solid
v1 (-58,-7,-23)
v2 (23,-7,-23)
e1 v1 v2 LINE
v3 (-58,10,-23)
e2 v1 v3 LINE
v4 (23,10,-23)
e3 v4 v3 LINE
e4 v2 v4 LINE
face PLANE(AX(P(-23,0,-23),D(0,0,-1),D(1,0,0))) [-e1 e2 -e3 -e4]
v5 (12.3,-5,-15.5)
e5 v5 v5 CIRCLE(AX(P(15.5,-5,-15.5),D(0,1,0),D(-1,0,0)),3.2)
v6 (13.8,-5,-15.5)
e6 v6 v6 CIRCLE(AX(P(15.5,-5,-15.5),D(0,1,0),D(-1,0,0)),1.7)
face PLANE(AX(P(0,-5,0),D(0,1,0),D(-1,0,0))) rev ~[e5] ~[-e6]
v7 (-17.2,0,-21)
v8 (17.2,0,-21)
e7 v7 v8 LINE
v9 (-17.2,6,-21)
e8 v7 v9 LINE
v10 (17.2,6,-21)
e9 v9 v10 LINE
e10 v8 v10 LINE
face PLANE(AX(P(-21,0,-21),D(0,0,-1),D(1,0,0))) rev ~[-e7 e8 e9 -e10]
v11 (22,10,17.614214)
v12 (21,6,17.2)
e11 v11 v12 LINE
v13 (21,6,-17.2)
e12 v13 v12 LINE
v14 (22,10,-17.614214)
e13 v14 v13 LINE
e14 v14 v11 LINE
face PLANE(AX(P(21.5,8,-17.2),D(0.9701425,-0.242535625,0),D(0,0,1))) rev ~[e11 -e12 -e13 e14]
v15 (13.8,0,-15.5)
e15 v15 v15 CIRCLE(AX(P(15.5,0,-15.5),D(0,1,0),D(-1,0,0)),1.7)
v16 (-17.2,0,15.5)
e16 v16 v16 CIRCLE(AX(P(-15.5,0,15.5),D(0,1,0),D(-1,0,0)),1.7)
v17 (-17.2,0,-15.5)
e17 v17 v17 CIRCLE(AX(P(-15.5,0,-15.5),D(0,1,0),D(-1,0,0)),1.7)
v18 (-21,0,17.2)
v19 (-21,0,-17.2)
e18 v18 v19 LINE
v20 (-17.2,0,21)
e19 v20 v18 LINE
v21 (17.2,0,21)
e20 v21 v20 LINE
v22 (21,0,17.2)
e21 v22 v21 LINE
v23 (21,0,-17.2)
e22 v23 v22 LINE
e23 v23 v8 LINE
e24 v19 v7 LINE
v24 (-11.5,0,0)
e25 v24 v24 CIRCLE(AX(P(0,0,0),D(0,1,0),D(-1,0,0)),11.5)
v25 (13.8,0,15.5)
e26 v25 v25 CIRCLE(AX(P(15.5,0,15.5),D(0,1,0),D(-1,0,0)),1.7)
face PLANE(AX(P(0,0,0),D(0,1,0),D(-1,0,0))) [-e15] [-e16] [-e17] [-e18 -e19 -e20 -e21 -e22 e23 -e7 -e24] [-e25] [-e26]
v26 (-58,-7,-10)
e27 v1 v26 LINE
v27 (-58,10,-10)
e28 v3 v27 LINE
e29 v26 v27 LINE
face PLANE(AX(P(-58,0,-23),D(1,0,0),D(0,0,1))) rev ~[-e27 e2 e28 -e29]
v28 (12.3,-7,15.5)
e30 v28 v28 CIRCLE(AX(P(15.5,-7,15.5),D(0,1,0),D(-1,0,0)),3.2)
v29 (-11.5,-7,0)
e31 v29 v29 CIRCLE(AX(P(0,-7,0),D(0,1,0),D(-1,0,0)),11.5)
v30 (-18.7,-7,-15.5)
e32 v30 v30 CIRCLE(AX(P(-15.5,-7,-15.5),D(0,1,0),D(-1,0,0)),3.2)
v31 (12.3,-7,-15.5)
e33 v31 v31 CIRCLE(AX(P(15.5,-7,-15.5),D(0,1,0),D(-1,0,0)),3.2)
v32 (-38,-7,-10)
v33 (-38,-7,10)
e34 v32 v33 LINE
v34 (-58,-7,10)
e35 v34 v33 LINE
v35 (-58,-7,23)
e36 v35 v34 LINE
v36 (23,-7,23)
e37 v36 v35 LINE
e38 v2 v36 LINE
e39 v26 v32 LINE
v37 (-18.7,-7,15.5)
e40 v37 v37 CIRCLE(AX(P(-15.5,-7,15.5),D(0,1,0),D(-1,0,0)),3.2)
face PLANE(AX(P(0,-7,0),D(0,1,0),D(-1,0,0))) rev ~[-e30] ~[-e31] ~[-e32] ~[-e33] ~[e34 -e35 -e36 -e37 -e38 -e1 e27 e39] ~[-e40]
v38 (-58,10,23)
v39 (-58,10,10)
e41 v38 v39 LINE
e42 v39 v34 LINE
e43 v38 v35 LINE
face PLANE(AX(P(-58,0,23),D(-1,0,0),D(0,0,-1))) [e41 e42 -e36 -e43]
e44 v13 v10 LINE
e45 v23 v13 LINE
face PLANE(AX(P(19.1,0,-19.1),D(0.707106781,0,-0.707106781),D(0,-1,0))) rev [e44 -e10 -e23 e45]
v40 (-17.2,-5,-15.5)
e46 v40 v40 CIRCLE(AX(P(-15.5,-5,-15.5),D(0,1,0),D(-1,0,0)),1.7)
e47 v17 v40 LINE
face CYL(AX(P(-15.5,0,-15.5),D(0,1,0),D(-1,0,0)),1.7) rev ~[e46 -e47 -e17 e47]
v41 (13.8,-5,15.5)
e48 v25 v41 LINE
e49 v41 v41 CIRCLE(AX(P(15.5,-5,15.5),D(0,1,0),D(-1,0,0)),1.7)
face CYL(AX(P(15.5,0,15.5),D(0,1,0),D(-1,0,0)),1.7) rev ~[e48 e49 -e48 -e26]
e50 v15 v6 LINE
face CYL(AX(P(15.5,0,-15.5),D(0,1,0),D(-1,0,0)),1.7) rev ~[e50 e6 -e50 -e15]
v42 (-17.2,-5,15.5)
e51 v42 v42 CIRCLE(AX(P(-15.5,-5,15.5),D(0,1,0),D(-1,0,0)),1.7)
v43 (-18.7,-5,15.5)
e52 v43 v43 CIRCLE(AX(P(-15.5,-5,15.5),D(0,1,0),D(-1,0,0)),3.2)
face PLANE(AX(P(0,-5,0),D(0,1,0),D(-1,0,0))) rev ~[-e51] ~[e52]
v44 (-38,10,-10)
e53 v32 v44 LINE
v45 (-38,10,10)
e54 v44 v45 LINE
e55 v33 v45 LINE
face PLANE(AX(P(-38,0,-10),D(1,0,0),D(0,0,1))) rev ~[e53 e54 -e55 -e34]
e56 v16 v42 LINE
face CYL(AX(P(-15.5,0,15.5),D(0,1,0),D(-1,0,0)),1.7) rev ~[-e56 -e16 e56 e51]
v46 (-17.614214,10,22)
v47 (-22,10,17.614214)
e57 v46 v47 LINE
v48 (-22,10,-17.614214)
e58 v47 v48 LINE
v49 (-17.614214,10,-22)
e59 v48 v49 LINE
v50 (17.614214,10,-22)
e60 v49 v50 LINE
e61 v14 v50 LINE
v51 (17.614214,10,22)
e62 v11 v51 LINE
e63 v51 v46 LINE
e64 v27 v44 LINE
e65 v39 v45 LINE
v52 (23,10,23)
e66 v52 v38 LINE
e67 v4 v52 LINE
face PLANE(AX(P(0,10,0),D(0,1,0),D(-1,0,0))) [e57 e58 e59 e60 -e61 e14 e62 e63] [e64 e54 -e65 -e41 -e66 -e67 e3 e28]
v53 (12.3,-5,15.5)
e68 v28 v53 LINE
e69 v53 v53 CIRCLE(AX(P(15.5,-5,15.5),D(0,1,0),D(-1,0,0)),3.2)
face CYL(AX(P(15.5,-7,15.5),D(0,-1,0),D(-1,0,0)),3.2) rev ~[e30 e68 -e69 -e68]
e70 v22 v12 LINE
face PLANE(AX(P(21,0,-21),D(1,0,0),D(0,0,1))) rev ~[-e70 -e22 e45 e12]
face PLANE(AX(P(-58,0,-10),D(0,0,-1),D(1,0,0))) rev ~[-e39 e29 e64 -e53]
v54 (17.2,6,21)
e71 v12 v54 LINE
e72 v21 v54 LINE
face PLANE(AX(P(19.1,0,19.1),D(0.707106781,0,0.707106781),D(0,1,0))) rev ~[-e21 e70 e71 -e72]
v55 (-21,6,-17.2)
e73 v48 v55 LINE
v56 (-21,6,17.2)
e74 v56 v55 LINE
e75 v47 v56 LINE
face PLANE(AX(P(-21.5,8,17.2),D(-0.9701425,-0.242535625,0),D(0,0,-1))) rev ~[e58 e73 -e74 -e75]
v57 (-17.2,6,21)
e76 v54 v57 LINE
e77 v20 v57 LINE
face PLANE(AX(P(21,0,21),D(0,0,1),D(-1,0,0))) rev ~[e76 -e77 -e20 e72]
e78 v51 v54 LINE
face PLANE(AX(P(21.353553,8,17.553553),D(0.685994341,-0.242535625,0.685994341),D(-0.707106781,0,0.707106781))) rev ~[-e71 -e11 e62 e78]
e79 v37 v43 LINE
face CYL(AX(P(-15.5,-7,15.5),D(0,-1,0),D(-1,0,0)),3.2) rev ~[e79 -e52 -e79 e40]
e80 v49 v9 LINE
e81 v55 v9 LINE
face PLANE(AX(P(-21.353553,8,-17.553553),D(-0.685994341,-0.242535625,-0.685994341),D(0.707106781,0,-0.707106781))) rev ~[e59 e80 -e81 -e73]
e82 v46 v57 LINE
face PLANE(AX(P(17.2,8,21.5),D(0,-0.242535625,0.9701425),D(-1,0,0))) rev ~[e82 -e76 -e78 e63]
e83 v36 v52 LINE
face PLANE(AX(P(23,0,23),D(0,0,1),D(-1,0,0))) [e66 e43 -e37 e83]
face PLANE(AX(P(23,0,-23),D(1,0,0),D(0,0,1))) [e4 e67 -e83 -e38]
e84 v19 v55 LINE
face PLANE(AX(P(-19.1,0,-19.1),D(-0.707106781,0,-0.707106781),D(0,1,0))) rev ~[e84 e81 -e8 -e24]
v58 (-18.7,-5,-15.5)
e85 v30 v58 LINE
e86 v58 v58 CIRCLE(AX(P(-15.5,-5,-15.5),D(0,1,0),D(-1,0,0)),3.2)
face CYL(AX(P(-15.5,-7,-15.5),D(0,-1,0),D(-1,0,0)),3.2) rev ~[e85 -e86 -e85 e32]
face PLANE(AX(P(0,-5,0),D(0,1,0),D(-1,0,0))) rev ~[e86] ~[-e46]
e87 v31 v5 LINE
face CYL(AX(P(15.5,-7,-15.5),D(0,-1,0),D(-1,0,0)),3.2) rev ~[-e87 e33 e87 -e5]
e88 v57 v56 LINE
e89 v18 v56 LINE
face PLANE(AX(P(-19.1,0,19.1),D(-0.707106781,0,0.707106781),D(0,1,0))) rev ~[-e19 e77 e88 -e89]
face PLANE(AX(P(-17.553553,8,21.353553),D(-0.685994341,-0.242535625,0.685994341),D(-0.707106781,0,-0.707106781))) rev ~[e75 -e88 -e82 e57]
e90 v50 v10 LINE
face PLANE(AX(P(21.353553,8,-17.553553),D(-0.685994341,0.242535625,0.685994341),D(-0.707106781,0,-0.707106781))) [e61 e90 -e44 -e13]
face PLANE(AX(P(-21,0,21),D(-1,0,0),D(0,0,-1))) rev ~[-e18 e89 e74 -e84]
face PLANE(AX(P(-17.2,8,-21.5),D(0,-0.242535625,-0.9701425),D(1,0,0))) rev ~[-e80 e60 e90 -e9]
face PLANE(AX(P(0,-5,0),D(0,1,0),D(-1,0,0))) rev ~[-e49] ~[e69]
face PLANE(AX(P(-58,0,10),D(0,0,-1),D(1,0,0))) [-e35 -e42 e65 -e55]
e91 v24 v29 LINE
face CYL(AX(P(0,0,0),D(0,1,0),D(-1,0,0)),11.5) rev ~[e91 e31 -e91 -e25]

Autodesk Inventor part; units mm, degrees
ref_plane "YZ Plane" through (0, 0, 0) normal (1, 0, 0) x (0, 1, 0)
ref_plane "XZ Plane" through (0, 0, 0) normal (0, 1, 0) x (-1, 0, 0)
ref_plane "XY Plane" through (0, 0, 0) normal (0, 0, 1) x (1, 0, 0)
sketch "Sketch1" plane through (0, 0, 0) normal (0, 1, 0) x (-1, 0, 0)
  line L0 (-21, 21) -> (21, 21)
  line L1 (21, 21) -> (21, -21)
  line L2 (21, -21) -> (-21, -21)
  line L3 (-21, -21) -> (-21, 21)
  line L4 (-21, 21) -> (21, -21) construction
  line L5 (21, 21) -> (-21, -21) construction
  circle A0 centre (15.5, -15.5) radius 1.7
  circle A1 centre (-15.5, -15.5) radius 1.7
  line L6 (15.5, -15.5) -> (-15.5, -15.5) construction
  circle A2 centre (15.5, 15.5) radius 1.7
  line L7 (15.5, 15.5) -> (-15.5, 15.5) construction
  circle A3 centre (-15.5, 15.5) radius 1.7
  line L8 (-23, 23) -> (23, 23)
  line L9 (23, 23) -> (23, -23)
  line L10 (23, -23) -> (-23, -23)
  line L11 (-23, -23) -> (-23, 23)
  circle A4 centre (0, 0) radius 11.5
  line L12 (23, 23) -> (-23, 23)
  circle A5 centre (15.5, 15.5) radius 3.2
  circle A6 centre (-15.5, 15.5) radius 3.2
  circle A7 centre (-15.5, -15.5) radius 3.2
  circle A8 centre (15.5, -15.5) radius 3.2
  line L13 (23, 23) -> (58, 23)
  line L14 (58, 23) -> (58, 10)
  line L15 (58, 10) -> (23, 10)
  line L16 (23, 10) -> (23, 23)
  line L17 (23, -23) -> (58, -23)
  line L18 (58, -23) -> (58, -10)
  line L19 (58, -10) -> (23, -10)
  line L20 (23, -10) -> (23, -23)
  line L21 (38, -10) -> (38, 10)
  dimension "d20" = 31
  dimension "d21" = 42
  dimension "d22" = 42
  dimension "d23" = 3.4
  dimension "d24" = 3.4
  dimension "d25" = 3.4
  dimension "d26" = 31
  dimension "d27" = 3.4
  dimension "d28" = 2
  dimension "d29" = 2
  dimension "d30" = 2
  dimension "d31" = 2
  dimension "d32" = 23
  dimension "d60" = 1.5
  dimension "d61" = 1.5
  dimension "d62" = 1.5
  dimension "d63" = 1.5
  dimension "d74" = 15
  dimension "d75" = 20
  dimension "d76" = 20
extrude "Extrusion1" add sketch "Sketch1" along normal blind 10 contours L8 L9 L10 L11 | L13 L14 L15 L9 | L15 L21 L19 L9 | L9 L19 L18 L17
extrude "Extrusion2" add sketch "Sketch1" against normal blind 7 contours L0 L1 L2 L3 | L8 L9 L10 L11 | L13 L14 L15 L9 | L15 L21 L19 L9 | L9 L19 L18 L17 | A5 | A6 | A7 | A8
chamfer "Chamfer1" distance 3.8 angle 45 4 edges at (-21, 5, 21) (-21, 5, -21) (21, 5, -21) (21, 5, 21)
chamfer "Chamfer2" distance 1 distance2 4 8 edges at (0, 10, -21) (19.1, 10, -19.1) (21, 10, 0) (19.1, 10, 19.1) (0, 10, 21) (-21, 10, 0) (-19.1, 10, -19.1) (-19.1, 10, 19.1) measured on face at (-26.6667, 10, 3.3333)
extrude "Extrusion3" cut sketch "Sketch1" along normal blind 2 from surface at -7 contours A3 | A5 | A6 | A7 | A8
equation "\"d24\" = d23"
equation "\"d25\" = d23"
equation "\"d26\" = d20"
equation "\"d27\" = d23"
equation "\"d29\" = d28"
equation "\"d30\" = d31"
properties part number "Z Stepper Holder"
